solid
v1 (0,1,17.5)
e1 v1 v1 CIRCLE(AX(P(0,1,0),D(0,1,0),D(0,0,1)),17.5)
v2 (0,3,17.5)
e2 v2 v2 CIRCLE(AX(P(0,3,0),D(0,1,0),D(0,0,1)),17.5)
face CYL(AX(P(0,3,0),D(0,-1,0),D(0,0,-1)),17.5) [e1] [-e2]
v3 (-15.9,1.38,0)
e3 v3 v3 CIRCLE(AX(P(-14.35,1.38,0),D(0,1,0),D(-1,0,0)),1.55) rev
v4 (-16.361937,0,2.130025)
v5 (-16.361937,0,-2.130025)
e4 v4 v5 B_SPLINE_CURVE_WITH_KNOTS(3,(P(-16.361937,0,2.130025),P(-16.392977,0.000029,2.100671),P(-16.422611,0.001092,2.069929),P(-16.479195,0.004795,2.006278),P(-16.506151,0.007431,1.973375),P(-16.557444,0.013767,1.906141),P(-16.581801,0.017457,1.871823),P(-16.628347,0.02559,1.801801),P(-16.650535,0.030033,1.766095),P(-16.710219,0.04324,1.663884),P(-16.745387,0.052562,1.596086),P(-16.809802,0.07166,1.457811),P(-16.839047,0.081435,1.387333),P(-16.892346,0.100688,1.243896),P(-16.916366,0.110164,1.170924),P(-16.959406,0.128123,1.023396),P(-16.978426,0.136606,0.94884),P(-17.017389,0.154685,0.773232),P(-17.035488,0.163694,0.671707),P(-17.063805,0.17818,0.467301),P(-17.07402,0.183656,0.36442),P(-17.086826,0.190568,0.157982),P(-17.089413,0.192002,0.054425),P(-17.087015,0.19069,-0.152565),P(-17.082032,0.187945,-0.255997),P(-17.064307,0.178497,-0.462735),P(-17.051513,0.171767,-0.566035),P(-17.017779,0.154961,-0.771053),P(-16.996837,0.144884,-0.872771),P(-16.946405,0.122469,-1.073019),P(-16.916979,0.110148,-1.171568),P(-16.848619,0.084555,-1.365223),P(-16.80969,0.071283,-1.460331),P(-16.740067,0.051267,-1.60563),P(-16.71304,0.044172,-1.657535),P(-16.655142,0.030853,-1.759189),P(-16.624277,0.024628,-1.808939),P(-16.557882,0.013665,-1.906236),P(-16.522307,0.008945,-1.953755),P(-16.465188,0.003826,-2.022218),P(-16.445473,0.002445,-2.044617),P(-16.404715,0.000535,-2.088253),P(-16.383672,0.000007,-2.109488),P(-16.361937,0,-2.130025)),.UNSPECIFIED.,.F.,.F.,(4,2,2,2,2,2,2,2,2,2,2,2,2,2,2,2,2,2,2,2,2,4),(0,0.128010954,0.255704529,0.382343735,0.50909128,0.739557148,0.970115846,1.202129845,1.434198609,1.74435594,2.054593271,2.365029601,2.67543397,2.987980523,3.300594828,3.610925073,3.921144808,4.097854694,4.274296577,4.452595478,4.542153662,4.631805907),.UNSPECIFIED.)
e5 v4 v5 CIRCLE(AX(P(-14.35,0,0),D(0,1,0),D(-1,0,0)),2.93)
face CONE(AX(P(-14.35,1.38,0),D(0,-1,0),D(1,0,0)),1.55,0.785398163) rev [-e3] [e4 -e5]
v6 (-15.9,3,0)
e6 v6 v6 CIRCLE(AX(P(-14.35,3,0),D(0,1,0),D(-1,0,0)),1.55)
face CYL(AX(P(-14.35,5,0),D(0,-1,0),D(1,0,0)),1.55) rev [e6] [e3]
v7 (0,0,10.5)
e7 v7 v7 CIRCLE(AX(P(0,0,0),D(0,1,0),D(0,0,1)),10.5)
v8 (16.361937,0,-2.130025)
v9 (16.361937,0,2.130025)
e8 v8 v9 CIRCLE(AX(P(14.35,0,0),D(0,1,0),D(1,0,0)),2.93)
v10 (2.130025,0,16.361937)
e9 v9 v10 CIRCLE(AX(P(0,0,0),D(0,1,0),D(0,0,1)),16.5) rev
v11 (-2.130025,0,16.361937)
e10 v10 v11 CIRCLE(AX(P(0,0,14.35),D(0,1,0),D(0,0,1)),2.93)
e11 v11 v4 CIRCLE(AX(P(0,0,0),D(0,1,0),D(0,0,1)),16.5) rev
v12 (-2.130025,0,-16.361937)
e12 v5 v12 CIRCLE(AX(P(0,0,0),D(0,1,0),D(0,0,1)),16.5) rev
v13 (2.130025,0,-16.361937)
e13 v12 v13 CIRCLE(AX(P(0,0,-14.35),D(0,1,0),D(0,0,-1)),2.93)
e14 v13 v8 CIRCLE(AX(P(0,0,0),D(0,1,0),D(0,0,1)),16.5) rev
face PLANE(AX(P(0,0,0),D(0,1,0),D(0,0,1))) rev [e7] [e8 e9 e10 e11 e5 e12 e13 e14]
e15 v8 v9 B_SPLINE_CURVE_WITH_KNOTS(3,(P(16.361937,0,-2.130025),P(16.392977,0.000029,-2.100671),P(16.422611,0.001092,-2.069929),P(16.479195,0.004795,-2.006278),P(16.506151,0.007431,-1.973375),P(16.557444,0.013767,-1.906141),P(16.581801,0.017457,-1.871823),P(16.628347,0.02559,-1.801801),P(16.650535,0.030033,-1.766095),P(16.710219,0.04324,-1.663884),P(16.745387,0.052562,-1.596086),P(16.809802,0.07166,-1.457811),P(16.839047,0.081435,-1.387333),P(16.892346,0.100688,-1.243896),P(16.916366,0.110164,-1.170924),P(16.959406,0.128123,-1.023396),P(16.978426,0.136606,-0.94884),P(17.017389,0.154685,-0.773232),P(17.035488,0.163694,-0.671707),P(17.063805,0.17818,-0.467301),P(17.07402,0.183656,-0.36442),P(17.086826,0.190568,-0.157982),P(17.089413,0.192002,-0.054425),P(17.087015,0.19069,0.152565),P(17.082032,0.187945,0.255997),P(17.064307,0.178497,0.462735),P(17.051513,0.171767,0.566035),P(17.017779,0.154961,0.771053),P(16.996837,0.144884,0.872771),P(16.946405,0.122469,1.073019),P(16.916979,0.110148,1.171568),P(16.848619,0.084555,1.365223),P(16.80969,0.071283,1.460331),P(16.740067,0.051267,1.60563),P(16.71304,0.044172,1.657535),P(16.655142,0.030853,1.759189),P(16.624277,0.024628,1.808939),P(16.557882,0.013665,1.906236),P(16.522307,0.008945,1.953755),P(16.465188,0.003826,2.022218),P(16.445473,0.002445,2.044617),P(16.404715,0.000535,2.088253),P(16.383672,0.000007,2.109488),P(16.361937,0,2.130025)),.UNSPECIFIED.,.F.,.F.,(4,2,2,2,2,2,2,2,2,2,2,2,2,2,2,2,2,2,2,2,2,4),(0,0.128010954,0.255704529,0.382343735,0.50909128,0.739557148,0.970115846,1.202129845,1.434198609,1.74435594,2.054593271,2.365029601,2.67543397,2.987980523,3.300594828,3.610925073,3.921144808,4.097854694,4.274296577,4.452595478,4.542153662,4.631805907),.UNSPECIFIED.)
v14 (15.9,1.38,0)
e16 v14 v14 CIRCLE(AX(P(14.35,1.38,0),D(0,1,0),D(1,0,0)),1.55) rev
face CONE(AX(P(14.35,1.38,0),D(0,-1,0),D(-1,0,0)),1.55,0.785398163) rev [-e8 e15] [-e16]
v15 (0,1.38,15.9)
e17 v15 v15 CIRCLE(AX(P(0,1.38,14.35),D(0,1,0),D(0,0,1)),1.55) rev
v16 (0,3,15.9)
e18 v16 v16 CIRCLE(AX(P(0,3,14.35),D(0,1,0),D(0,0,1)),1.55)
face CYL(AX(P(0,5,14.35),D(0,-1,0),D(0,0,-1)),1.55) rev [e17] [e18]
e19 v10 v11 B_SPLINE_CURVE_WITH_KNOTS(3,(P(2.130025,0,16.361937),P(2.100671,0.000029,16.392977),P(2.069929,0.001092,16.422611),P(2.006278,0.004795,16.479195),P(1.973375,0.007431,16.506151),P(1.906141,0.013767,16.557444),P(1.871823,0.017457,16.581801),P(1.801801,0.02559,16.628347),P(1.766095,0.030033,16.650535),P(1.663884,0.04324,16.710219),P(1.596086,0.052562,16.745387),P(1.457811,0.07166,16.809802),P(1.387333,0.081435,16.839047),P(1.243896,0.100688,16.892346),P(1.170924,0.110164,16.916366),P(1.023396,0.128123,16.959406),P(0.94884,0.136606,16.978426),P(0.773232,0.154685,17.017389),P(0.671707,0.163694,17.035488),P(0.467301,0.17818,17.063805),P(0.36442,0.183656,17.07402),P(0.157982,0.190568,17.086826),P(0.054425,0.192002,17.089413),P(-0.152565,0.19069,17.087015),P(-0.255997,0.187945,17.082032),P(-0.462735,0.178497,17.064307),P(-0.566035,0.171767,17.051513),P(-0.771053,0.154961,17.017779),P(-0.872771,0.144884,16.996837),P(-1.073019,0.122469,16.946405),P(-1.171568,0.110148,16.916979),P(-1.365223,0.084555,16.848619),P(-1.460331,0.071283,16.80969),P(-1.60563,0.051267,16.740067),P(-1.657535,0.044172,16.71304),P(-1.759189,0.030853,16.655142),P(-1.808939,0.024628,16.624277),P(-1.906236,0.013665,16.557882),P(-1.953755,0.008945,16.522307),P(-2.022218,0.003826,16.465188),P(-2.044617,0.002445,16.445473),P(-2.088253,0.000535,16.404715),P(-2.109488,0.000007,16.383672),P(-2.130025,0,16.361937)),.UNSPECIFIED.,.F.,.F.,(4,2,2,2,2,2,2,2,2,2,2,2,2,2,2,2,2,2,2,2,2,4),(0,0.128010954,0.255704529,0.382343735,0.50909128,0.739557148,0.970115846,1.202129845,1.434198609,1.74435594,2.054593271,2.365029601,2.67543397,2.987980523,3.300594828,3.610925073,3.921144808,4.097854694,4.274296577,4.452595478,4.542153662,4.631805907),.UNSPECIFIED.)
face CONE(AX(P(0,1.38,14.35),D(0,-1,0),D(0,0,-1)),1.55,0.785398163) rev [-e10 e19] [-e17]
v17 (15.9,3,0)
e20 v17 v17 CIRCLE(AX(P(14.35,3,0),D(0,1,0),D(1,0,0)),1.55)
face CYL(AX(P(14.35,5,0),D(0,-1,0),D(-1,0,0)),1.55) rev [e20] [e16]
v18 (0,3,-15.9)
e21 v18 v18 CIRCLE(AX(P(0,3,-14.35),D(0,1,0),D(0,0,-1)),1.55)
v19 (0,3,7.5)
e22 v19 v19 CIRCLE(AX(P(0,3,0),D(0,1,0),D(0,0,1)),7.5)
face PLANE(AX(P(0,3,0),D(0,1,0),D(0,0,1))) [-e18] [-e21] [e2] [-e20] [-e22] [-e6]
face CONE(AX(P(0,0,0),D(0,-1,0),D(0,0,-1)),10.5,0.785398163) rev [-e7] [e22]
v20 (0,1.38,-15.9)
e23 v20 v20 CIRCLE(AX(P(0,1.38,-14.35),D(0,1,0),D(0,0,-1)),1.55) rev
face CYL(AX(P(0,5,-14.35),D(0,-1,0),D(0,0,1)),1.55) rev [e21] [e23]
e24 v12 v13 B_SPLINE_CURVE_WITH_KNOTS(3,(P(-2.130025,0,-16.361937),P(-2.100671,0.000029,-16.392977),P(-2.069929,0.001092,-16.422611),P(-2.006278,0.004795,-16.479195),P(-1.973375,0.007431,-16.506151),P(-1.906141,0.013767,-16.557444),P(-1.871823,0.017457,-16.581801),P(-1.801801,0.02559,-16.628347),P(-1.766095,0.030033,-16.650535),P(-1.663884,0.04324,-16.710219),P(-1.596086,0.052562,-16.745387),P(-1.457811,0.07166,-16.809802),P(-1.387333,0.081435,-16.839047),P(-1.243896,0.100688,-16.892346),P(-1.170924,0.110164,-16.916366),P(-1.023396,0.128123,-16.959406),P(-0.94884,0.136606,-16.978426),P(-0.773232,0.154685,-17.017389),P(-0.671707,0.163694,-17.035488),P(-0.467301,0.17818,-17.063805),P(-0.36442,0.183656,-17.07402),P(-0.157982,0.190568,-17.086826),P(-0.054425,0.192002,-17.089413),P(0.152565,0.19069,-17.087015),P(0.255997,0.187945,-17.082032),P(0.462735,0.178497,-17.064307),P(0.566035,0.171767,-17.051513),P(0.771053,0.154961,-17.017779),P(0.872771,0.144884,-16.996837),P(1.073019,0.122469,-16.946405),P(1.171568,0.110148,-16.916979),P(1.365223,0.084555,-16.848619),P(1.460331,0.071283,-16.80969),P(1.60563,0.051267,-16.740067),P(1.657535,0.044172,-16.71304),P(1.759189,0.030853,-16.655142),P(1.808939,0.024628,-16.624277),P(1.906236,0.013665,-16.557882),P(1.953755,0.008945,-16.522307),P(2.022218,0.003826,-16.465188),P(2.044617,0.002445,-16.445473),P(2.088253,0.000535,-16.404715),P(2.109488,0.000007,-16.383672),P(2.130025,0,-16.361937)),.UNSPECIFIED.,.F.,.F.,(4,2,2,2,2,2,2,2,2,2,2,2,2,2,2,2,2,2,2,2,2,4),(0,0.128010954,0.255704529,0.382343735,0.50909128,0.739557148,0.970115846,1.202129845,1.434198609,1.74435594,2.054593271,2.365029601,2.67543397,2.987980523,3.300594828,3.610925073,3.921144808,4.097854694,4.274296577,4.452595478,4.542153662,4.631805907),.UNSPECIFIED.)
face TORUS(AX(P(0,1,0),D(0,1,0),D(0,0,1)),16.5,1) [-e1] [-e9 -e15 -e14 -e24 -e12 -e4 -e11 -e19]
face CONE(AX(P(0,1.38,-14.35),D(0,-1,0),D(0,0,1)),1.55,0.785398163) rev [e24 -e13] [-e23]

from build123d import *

# Parameters (mm, degrees)
SKETCH1_R                    = 17.5
SKETCH1_R_2                  = 7.5
BOSS_EXTRUDE1_DEPTH          = 3
SKETCH3_R                    = 1.55
CUT_EXTRUDE1_DEPTH           = 5
CHAMFER6_SIZE                = 1.38
CIRPATTERN2_COUNT            = 4
CHAMFER6_OF_CIRPATTERN2_SIZE = 1.38
CHAMFER7_SIZE                = 3
FILLET1_R                    = 1


# Some blends are built 0.0001 mm under size
with BuildPart() as part:
    # Sketch1 → Boss-Extrude1 (new body)
    with BuildSketch(Plane(origin=(0, 0, 0), x_dir=(1, 0, 0), z_dir=(0, 1, 0))):
        with Locations(Location((0, 0, 0), (0, 0, 270))):
            Circle(SKETCH1_R)
        with Locations(Location((0, 0, 0), (0, 0, 270))):
            Circle(SKETCH1_R_2, mode=Mode.SUBTRACT)
    extrude(amount=BOSS_EXTRUDE1_DEPTH)

    # Sketch3 → Cut-Extrude1 (cut)
    with BuildSketch(Plane.XZ):
        with Locations(Location((0, 14.35, 0), (0, 0, 270))):
            Circle(SKETCH3_R)
    cut_extrude1 = extrude(amount=-CUT_EXTRUDE1_DEPTH, mode=Mode.SUBTRACT)

    # Chamfer6
    chamfer6_edges = [part.edges().sort_by_distance(p)[0] for p in [
        (0, 0, 15.9),
    ]]
    chamfer(chamfer6_edges, length=CHAMFER6_SIZE)

    # CirPattern2: Cut-Extrude1 ×4 about axis
    cirpattern2_axis = Axis((0, 0, 0), (0, 1, 0))
    for i in range(1, CIRPATTERN2_COUNT):
        add(cut_extrude1.rotate(cirpattern2_axis, i * 360 / CIRPATTERN2_COUNT), mode=Mode.SUBTRACT)

    # Chamfer6 of CirPattern2
    chamfer6_of_cirpattern2_edges = [part.edges().sort_by_distance(p)[0] for p in [
        (15.9, 0, 0),
        (0, 0, -15.9),
        (-15.9, 0, 0),
    ]]
    chamfer(chamfer6_of_cirpattern2_edges, length=CHAMFER6_OF_CIRPATTERN2_SIZE)

    # Chamfer7
    chamfer7_edges = [part.edges().sort_by_distance(p)[0] for p in [
        (0, 0, -7.5),
    ]]
    chamfer(chamfer7_edges, length=CHAMFER7_SIZE - 0.0001)  # a hair under: the kernel refuses the full size

    # Fillet1
    # the kernel refuses this fillet: 1 mm, written as the material it takes off along each edge
    with BuildSketch(Plane(origin=(0, 0, 0), x_dir=(0, 0, 1), z_dir=(-1, 0, 0))) as fillet1_piece_1:
        with BuildLine():
            CenterArc((17.5 - FILLET1_R, FILLET1_R), FILLET1_R, 270, 90)
            Line((17.5, FILLET1_R), (17.5, 0))
            Line((17.5, 0), (17.5 - FILLET1_R, 0))
        make_face()
    revolve(axis=Axis((0, 0, 0), (0, 1, 0)), mode=Mode.SUBTRACT)


solid = part.part
